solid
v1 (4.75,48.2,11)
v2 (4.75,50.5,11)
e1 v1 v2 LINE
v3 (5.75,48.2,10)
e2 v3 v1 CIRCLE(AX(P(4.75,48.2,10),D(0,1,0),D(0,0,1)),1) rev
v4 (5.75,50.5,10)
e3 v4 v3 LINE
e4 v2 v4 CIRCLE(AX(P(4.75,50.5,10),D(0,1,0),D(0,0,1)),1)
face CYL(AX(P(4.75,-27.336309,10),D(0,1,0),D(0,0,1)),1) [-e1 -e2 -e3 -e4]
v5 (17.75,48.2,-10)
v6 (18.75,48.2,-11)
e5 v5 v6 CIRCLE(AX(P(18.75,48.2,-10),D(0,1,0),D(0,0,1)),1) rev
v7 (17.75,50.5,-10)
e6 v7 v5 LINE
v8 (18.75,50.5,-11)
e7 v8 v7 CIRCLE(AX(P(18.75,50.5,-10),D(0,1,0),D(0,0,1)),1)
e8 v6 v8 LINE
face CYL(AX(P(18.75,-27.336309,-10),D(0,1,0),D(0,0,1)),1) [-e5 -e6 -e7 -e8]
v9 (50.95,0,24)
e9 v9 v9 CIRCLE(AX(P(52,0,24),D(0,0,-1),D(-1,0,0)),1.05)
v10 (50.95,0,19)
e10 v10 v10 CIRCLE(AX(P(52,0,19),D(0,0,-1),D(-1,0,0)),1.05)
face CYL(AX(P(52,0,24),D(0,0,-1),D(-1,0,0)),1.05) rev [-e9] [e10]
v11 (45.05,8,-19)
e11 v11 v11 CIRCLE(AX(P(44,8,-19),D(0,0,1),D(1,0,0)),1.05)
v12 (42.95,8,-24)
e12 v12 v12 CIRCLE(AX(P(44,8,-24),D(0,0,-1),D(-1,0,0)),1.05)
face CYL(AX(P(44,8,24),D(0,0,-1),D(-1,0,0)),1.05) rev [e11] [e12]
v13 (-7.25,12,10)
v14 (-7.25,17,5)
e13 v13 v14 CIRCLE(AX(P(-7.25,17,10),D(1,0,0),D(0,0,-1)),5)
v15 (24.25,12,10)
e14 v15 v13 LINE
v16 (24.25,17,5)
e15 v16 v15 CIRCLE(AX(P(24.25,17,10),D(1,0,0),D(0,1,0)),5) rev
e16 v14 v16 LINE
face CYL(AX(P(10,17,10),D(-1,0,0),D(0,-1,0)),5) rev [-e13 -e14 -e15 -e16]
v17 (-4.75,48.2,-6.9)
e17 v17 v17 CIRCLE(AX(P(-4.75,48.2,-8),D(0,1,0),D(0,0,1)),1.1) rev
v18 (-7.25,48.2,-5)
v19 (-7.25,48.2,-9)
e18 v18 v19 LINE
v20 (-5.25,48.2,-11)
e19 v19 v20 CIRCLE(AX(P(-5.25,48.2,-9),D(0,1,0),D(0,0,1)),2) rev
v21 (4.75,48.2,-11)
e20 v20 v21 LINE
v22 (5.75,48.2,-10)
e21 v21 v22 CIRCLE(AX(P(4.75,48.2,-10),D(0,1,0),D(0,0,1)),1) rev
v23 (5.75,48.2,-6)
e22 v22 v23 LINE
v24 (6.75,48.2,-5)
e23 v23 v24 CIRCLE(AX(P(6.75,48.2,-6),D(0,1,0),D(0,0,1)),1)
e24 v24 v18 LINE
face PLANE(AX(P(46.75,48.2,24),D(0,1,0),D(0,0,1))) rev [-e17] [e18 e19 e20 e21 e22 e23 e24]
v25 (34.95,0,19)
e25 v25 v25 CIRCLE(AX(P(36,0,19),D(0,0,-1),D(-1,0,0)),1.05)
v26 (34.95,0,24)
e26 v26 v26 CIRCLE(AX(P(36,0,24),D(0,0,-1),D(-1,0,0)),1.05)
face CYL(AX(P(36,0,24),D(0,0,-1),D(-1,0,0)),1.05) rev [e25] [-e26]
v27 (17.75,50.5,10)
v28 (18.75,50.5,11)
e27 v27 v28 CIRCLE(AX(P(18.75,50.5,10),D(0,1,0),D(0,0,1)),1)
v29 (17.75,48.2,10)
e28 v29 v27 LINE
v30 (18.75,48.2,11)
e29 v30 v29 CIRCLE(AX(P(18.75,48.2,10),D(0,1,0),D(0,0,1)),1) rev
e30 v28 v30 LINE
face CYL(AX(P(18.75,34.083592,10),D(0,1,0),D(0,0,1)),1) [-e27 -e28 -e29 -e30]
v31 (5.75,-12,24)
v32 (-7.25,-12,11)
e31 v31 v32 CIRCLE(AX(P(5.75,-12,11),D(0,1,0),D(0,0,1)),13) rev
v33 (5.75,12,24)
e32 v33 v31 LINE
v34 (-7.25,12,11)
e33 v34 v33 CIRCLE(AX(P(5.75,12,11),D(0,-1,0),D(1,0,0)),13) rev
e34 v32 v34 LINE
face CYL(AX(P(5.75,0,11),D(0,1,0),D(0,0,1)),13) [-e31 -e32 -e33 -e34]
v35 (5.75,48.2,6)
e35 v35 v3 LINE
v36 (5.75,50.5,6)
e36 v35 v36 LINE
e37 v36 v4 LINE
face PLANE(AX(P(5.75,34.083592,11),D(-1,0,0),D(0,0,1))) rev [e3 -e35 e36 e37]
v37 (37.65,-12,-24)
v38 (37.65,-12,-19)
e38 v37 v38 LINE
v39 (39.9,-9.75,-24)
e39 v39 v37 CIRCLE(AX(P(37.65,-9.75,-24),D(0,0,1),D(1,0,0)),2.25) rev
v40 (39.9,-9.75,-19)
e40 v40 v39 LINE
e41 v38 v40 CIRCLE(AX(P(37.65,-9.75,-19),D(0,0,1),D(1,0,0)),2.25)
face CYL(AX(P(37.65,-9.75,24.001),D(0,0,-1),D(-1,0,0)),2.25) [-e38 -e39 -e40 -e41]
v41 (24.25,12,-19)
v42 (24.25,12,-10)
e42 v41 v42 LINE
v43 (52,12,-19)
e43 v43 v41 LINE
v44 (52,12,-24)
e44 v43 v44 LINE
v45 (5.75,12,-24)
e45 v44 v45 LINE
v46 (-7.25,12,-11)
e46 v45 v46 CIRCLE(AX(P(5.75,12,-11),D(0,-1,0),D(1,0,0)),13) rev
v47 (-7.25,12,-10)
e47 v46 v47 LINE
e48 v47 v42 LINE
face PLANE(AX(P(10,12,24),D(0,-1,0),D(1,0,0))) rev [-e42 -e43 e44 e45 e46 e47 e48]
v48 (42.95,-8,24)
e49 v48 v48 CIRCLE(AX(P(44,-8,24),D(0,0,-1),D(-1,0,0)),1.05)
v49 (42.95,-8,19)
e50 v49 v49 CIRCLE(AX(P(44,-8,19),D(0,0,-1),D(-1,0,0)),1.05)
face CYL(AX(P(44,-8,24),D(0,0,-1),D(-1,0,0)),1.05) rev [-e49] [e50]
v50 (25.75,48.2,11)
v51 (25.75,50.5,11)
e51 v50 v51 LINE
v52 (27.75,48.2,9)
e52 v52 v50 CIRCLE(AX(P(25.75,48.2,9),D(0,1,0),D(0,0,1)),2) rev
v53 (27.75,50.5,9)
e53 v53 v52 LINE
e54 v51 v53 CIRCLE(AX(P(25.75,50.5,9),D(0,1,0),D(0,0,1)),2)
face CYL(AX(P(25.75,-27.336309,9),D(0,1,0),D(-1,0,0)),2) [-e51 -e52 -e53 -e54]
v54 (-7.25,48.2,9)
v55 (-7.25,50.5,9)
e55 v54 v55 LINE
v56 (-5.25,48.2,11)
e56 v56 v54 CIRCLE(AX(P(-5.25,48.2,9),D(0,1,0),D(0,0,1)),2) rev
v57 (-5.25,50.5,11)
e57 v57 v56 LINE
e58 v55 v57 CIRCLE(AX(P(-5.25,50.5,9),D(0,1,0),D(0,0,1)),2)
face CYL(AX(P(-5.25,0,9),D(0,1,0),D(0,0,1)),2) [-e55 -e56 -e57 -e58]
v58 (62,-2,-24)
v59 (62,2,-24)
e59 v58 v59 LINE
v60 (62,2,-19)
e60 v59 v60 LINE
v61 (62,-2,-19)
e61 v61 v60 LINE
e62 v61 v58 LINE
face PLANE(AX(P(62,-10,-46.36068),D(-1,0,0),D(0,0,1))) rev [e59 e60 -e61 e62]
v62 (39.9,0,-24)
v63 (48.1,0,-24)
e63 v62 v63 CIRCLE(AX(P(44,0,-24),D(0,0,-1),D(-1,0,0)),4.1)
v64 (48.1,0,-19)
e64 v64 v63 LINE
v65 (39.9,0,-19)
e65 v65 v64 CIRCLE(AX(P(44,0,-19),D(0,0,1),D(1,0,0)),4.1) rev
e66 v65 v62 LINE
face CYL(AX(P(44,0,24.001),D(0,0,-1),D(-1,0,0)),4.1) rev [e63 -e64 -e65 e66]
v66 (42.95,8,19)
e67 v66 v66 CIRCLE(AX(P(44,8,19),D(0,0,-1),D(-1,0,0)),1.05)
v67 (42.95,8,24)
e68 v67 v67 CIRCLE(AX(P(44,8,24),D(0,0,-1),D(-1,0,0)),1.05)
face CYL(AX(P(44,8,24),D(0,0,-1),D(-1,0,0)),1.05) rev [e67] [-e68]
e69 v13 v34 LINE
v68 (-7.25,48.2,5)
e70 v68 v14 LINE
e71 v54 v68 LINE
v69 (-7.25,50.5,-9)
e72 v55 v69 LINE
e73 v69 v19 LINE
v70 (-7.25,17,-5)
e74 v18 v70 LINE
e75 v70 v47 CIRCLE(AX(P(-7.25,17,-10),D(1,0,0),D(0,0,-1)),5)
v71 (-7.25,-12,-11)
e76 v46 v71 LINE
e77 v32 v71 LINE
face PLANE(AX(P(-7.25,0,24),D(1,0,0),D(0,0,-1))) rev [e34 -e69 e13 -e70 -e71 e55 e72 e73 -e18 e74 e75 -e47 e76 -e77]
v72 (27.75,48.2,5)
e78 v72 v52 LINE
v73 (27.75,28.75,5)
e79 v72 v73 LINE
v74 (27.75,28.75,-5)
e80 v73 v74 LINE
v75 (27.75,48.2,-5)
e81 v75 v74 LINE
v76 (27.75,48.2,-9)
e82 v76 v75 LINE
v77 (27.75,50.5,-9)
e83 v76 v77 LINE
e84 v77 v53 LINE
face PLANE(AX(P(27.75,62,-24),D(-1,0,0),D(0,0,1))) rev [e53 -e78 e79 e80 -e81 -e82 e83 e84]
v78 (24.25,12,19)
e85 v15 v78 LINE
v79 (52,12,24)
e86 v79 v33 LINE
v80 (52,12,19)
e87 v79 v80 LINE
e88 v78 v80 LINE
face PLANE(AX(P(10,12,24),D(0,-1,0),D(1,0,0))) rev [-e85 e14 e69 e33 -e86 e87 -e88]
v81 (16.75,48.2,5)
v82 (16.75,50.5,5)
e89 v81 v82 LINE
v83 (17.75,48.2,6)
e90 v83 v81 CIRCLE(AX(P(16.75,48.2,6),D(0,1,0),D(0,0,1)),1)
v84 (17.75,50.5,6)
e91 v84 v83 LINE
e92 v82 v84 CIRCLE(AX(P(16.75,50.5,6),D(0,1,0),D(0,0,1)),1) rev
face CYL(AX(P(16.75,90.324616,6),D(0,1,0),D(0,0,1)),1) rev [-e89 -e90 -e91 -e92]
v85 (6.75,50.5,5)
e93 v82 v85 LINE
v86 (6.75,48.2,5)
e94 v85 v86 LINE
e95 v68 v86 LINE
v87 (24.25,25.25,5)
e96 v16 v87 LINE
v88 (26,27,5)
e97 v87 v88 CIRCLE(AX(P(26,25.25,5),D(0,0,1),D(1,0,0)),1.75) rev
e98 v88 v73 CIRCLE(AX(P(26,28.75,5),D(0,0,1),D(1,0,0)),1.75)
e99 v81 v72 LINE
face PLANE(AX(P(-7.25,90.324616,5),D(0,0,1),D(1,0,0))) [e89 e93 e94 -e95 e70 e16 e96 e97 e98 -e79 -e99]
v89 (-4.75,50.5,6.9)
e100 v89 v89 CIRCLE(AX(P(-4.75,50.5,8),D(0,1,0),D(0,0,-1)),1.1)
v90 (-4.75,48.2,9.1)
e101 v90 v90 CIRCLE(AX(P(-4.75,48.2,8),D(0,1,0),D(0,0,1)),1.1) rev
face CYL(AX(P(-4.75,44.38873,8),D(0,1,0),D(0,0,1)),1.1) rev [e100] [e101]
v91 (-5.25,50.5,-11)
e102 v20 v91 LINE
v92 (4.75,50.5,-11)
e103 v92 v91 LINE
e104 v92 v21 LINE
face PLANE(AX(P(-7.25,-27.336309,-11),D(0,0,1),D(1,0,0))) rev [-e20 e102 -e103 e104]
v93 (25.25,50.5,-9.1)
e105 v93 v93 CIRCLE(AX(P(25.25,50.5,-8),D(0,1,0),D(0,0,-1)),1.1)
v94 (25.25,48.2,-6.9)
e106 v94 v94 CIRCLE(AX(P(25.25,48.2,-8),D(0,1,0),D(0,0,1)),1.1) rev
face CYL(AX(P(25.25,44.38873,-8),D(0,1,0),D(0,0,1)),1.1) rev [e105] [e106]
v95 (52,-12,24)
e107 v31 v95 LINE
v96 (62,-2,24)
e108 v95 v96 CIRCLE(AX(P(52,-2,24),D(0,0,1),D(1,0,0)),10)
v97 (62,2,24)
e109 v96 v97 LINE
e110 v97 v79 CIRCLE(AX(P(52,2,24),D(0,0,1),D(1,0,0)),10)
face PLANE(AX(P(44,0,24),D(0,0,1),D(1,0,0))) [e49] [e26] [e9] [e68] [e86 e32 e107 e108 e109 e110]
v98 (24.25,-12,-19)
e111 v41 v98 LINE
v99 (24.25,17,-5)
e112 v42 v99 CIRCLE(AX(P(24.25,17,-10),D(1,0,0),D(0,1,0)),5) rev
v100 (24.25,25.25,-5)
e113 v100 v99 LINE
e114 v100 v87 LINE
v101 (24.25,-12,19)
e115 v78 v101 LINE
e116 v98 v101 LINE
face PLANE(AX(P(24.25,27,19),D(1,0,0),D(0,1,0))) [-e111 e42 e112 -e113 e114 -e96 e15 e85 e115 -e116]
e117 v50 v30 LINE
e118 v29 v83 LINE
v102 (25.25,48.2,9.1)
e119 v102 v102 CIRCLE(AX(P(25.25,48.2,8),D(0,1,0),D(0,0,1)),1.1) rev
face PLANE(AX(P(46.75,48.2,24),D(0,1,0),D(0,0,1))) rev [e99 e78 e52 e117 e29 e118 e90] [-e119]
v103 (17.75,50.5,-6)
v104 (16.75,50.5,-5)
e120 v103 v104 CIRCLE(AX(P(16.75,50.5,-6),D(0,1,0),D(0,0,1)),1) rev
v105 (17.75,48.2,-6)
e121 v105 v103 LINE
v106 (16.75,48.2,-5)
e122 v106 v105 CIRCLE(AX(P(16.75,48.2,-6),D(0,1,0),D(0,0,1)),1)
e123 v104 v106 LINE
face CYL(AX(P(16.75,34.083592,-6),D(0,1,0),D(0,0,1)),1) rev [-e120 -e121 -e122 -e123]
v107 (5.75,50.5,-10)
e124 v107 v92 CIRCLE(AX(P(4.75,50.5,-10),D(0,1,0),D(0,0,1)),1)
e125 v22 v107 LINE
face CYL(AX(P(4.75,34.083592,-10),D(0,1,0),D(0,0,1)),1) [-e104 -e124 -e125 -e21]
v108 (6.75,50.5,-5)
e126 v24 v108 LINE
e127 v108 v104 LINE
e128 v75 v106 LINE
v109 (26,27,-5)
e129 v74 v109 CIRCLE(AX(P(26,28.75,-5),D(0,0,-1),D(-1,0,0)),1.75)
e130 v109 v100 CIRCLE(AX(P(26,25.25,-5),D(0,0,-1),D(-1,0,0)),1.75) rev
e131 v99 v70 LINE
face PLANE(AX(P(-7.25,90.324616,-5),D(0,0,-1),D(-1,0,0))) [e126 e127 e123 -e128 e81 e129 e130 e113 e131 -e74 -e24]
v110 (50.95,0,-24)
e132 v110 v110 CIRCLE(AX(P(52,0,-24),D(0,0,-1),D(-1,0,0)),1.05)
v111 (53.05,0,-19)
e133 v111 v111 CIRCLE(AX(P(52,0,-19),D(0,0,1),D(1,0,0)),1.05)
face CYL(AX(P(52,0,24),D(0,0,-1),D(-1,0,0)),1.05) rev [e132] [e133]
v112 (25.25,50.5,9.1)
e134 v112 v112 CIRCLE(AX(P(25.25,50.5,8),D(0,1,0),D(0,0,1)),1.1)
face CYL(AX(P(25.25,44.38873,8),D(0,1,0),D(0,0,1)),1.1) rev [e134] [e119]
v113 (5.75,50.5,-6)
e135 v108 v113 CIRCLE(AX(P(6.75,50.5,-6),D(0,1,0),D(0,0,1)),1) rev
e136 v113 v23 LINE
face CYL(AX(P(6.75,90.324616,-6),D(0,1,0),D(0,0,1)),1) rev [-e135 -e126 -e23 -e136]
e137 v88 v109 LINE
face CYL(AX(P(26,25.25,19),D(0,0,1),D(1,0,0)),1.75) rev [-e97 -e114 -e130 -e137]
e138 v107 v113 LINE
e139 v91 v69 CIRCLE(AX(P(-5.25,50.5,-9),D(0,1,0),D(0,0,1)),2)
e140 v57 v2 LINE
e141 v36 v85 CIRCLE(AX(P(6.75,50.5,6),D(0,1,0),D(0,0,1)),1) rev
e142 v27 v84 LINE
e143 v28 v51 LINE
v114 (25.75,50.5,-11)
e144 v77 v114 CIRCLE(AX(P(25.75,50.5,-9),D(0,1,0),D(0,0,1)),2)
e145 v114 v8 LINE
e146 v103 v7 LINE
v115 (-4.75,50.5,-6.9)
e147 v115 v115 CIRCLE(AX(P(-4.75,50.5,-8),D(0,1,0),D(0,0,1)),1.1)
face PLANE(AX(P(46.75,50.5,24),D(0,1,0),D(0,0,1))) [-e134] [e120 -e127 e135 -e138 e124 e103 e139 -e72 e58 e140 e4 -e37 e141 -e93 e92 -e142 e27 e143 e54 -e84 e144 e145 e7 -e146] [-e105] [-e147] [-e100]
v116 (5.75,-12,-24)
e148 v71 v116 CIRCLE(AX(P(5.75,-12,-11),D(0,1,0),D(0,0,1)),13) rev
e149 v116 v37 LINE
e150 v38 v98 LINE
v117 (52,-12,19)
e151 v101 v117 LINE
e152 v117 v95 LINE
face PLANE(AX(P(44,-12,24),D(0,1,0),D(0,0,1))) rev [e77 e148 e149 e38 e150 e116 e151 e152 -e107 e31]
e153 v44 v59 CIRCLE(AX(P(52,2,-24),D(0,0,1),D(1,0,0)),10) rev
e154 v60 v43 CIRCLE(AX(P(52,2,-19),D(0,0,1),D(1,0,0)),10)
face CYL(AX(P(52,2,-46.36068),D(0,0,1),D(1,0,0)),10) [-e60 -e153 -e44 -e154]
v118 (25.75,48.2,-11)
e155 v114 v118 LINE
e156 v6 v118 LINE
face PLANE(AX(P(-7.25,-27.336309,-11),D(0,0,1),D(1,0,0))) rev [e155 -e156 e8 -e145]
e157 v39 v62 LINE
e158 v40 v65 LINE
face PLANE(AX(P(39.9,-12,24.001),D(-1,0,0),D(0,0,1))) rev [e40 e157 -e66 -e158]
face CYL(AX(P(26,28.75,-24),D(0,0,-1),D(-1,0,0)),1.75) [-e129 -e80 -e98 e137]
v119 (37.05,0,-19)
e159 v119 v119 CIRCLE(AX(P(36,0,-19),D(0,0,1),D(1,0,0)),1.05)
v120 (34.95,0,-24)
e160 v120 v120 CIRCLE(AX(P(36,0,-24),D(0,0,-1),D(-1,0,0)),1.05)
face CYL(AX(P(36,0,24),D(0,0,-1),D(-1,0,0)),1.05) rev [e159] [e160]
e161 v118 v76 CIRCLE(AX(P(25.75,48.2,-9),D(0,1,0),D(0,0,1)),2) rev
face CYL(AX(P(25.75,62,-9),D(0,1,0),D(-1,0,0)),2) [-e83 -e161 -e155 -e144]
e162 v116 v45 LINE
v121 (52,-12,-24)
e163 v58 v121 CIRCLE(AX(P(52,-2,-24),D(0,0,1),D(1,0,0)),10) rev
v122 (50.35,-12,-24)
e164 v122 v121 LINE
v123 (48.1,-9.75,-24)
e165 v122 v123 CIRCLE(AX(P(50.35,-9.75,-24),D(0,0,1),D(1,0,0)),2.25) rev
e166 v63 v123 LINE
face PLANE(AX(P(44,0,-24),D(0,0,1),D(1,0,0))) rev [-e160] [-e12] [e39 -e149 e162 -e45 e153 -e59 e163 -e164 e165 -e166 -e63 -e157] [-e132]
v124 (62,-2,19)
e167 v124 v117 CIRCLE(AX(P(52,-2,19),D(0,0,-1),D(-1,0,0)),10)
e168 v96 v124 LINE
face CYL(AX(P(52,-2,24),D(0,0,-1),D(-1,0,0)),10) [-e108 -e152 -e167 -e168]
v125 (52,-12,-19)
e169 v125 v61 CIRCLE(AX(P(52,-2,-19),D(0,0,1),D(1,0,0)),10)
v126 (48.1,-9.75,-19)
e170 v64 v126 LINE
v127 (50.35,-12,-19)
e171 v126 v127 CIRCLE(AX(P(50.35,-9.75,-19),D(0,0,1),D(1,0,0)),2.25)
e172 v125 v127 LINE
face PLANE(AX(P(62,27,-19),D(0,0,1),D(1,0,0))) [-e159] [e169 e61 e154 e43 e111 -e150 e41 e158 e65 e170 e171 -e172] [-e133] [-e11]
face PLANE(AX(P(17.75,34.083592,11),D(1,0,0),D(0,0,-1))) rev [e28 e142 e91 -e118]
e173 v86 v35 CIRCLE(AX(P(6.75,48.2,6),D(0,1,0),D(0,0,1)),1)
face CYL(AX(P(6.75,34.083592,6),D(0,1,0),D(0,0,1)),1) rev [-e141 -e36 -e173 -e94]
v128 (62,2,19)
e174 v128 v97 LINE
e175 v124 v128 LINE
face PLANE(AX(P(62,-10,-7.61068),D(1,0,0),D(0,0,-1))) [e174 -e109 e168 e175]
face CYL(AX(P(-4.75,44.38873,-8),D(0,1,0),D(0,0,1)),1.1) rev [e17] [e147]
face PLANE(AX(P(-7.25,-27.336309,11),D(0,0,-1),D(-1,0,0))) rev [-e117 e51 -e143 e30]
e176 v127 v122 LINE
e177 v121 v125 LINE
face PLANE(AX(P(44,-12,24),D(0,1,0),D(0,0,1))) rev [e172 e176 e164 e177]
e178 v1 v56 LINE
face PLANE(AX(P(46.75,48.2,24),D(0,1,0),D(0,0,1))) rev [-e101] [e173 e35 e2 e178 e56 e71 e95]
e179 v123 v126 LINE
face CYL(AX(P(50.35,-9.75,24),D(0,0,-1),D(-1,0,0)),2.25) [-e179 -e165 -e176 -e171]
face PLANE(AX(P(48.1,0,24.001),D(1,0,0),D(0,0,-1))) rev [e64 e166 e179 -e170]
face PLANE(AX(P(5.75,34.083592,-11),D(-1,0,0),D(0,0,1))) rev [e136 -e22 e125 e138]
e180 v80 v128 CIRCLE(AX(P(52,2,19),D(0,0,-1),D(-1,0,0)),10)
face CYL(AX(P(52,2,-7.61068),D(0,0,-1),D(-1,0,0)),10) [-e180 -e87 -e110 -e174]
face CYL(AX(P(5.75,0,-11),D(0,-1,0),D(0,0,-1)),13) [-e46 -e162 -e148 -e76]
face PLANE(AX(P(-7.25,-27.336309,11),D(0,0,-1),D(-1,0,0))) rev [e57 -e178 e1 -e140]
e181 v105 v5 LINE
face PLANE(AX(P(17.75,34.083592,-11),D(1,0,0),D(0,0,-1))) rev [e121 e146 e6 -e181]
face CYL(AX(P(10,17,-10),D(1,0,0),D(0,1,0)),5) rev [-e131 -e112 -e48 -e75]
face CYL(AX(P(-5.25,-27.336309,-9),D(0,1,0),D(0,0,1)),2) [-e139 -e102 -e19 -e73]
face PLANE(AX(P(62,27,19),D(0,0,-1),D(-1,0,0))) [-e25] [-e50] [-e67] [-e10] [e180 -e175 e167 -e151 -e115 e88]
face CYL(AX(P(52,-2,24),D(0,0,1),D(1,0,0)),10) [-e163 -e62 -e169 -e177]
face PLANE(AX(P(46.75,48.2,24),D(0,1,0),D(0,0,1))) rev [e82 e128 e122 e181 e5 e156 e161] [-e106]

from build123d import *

# Parameters (mm, degrees)
EXTRUDE_1_DEPTH         = 24
SKETCH_2_W              = 24
SKETCH_2_H              = 29.5
CUT_EXTRUDE_1_DEPTH     = 79.714674617
SKETCH_3_R              = 1.1
CUT_EXTRUDE_2_DEPTH     = 96.205041883
SKETCH_4_W              = 15
SKETCH_4_H              = 48
EXTRUDE_2_DEPTH         = 52
SKETCH_5_W              = 35
SKETCH_5_H              = 13
CUT_EXTRUDE_3_DEPTH     = 52
SKETCH_6_W              = 35
SKETCH_6_H              = 20.5
CUT_EXTRUDE_4_DEPTH     = 11.5
SKETCH_7_W              = 35
SKETCH_7_H              = 19
CUT_EXTRUDE_5_DEPTH     = 37.5
SKETCH_8_R              = 1.1
CUT_EXTRUDE_6_DEPTH     = 3
CUT_EXTRUDE_7_DEPTH     = 96.205041883
SKETCH_10_W             = 35
SKETCH_10_H             = 22
CUT_EXTRUDE_8_DEPTH     = 11.5
SKETCH_11_W             = 12
SKETCH_11_H             = 6
CUT_EXTRUDE_9_DEPTH     = 3
FILLET_1_R              = 2
FILLET_2_R              = 1
SKETCH_14_R             = 0.75
CUT_EXTRUDE_12_DEPTH    = 8
SKETCH_17_R             = 1.9
CUT_EXTRUDE_13_DEPTH    = 1.4
SKETCH_26_W             = 65.219467354
SKETCH_26_H             = 31.879169378
CUT_EXTRUDE_17_DEPTH    = 2.75
CUT_EXTRUDE_18_DEPTH    = 0.7
SKETCH_28_R             = 4.45
EXTRUDE_11_DEPTH        = 8
EXTRUDE_12_REACH        = 89.179
SKETCH_29_W             = 35
SKETCH_29_H             = 48
SKETCH4_R               = 1.9
CUT_EXTRUDE3_DEPTH      = 1
BOSS_EXTRUDE2_DEPTH     = 9.25
CUT_EXTRUDE4_START      = -17.25
CUT_EXTRUDE4_DEPTH      = 8
BOSS_EXTRUDE3_START     = 29.5
BOSS_EXTRUDE3_DEPTH     = 9.25
CUT_EXTRUDE5_START      = 38.75
CUT_EXTRUDE5_DEPTH      = 49.724639182
SKETCH6_W               = 10
SKETCH6_H               = 20
BOSS_EXTRUDE4_DEPTH     = 9.25
BOSS_EXTRUDE5_START     = -38.75
SKETCH6_2_W             = 10
SKETCH6_2_H             = 20
BOSS_EXTRUDE5_DEPTH     = 9.25
MOVE_FACE1_BY           = 2
MOVE_FACE2_BY           = 2
MOVE_FACE3_BY           = 8
MOVE_FACE3_2_BY         = 8
CUT_EXTRUDE6_DEPTH      = 15
CUT_EXTRUDE6_DEPTH_BACK = 77.826102335
SKETCH7_W               = 37.75
SKETCH7_H               = 38
SKETCH8_R               = 1.05
CUT_EXTRUDE7_DEPTH      = 94.264409074
CUT_EXTRUDE8_REACH      = 95.264
FILLET1_R               = 10
FILLET2_R               = 2.25
FILLET3_R               = 1.75
FILLET4_R               = 13
FILLET5_R               = 5


with BuildPart() as part:
    # 草图1 → 凸台-拉伸1 (new, symmetric)
    with BuildSketch(Plane.XY):
        with BuildLine():
            Line((10, 10), (44, 10))
            ThreePointArc((44, 10), (54, 0), (44, -10))
            Line((44, -10), (0, -10))
            Line((0, -10), (-10, -10))
            Line((-10, -10), (-10, 0))
            Line((-10, 0), (-10, 62))
            Line((-10, 62), (10, 62))
            Line((10, 62), (10, 10))
        make_face()
    extrude(amount=EXTRUDE_1_DEPTH, both=True)

    # 草图2 → 切除-拉伸1 (cut, through all)
    with BuildSketch(Plane(origin=(0, 10, 0), x_dir=(1, 0, 0), z_dir=(0, 1, 0))):
        with Locations((42, 0)):
            Rectangle(SKETCH_2_W, SKETCH_2_H)
    extrude(amount=-CUT_EXTRUDE_1_DEPTH, mode=Mode.SUBTRACT)

    # 草图3 → 切除-拉伸2 (cut, through all)
    with BuildSketch(Plane.XY.offset(24)):
        with Locations((44, 6)):
            Circle(SKETCH_3_R)
        with Locations((50, 0)):
            Circle(SKETCH_3_R)
        with Locations((44, -6)):
            Circle(SKETCH_3_R)
        with Locations((38, 0)):
            Circle(SKETCH_3_R)
    extrude(amount=-CUT_EXTRUDE_2_DEPTH, mode=Mode.SUBTRACT)

    # 草图4 → 凸台-拉伸2 (add, through all)
    with BuildSketch(Plane(origin=(0, 10, 0), x_dir=(1, 0, 0), z_dir=(0, 1, 0))):
        with Locations((17.5, 0)):
            Rectangle(SKETCH_4_W, SKETCH_4_H)
    extrude(amount=EXTRUDE_2_DEPTH)

    # 草图5 → 切除-拉伸3 (cut)
    with BuildSketch(Plane(origin=(0, 62, 0), x_dir=(1, 0, 0), z_dir=(0, 1, 0))):
        with Locations((7.5, -17.5)):
            Rectangle(SKETCH_5_W, SKETCH_5_H)
        with Locations((7.5, 17.5)):
            Rectangle(SKETCH_5_W, SKETCH_5_H)
    extrude(amount=-CUT_EXTRUDE_3_DEPTH, mode=Mode.SUBTRACT)

    # 草图6 → 切除-拉伸4 (cut)
    with BuildSketch(Plane(origin=(0, 62, 0), x_dir=(1, 0, 0), z_dir=(0, 1, 0))):
        with Locations((7.5, 0)):
            Rectangle(SKETCH_6_W, SKETCH_6_H)
    extrude(amount=-CUT_EXTRUDE_4_DEPTH, mode=Mode.SUBTRACT)

    # 草图7 → 切除-拉伸5 (cut)
    with BuildSketch(Plane(origin=(0, 10, 0), x_dir=(1, 0, 0), z_dir=(0, 1, 0))):
        with Locations((7.5, 14.5)):
            Rectangle(SKETCH_7_W, SKETCH_7_H)
        with Locations((7.5, -14.5)):
            Rectangle(SKETCH_7_W, SKETCH_7_H)
    extrude(amount=CUT_EXTRUDE_5_DEPTH, mode=Mode.SUBTRACT)

    # 草图8 → 切除-拉伸6 (cut)
    with BuildSketch(Plane(origin=(0, 50.5, 0), x_dir=(1, 0, 0), z_dir=(0, 1, 0))):
        with Locations(Location((-7.5, 8, 0), (0, 0, 270))):
            Circle(SKETCH_8_R)
        with Locations(Location((22.5, 8, 0), (0, 0, 270))):
            Circle(SKETCH_8_R)
        with Locations(Location((22.5, -8, 0), (0, 0, 270))):
            Circle(SKETCH_8_R)
        with Locations(Location((-7.5, -8, 0), (0, 0, 270))):
            Circle(SKETCH_8_R)
    extrude(amount=-CUT_EXTRUDE_6_DEPTH, mode=Mode.SUBTRACT)

    # 草图9 → 切除-拉伸7 (cut, through all)
    with BuildSketch(Plane.XY.offset(24)):
        Polygon((-10, 4), (25, -10), (-10, -10), align=None)
    extrude(amount=-CUT_EXTRUDE_7_DEPTH, mode=Mode.SUBTRACT)

    # 草图10 → 切除-拉伸8 (cut)
    with BuildSketch(Plane(origin=(0, 62, 0), x_dir=(1, 0, 0), z_dir=(0, 1, 0))):
        with Locations((7.5, 0)):
            Rectangle(SKETCH_10_W, SKETCH_10_H)
    extrude(amount=-CUT_EXTRUDE_8_DEPTH, mode=Mode.SUBTRACT)

    # 草图11 → 切除-拉伸9 (cut)
    with BuildSketch(Plane(origin=(0, 50.5, 0), x_dir=(1, 0, 0), z_dir=(0, 1, 0))):
        with Locations((9, -8)):
            Rectangle(SKETCH_11_W, SKETCH_11_H)
        with Locations((9, 8)):
            Rectangle(SKETCH_11_W, SKETCH_11_H)
    extrude(amount=-CUT_EXTRUDE_9_DEPTH, mode=Mode.SUBTRACT)

    # 圆角1
    fillet_1_edges = [part.edges().sort_by_distance(p)[0] for p in [
        (-10, 49, -11),
        (25, 49, -11),
        (25, 49, 11),
        (-10, 49, 11),
    ]]
    fillet(fillet_1_edges, radius=FILLET_1_R)

    # 圆角2
    fillet_2_edges = [part.edges().sort_by_distance(p)[0] for p in [
        (3, 49, 11),
        (3, 49, 5),
        (15, 49, 5),
        (15, 49, 11),
        (3, 49, -11),
        (15, 49, -11),
        (15, 49, -5),
        (3, 49, -5),
    ]]
    fillet(fillet_2_edges, radius=FILLET_2_R)

    # 草图14 → 切除-拉伸12 (cut)
    with BuildSketch(Plane.XY.offset(24)):
        with Locations((12, 7)):
            Circle(SKETCH_14_R)
        with Locations((26, 7)):
            Circle(SKETCH_14_R)
    extrude(amount=-CUT_EXTRUDE_12_DEPTH, mode=Mode.SUBTRACT)

    # 草图17 → 切除-拉伸13 (cut)
    with BuildSketch(Plane.XY.offset(24)):
        with Locations((44, 6)):
            Circle(SKETCH_17_R)
        with Locations((50, 0)):
            Circle(SKETCH_17_R)
        with Locations((44, -6)):
            Circle(SKETCH_17_R)
        with Locations((38, 0)):
            Circle(SKETCH_17_R)
    extrude(amount=-CUT_EXTRUDE_13_DEPTH, mode=Mode.SUBTRACT)

    # 草图26 → 切除-拉伸17 (cut)
    with BuildSketch(Plane(origin=(30, 0, 0), x_dir=(0, 0, -1), z_dir=(1, 0, 0))):
        with Locations((0, -0.918796831)):
            Rectangle(SKETCH_26_W, SKETCH_26_H)
    extrude(amount=-CUT_EXTRUDE_17_DEPTH, mode=Mode.SUBTRACT)


with BuildPart() as cut_extrude_17_piece_1:
    # of the separate pieces the step leaves, piece 1, a body of its own (cut_extrude_17_pieces)
    add(part.part.solids().sort_by_distance((2, 47.5, -11))[0])


with BuildPart() as cut_extrude_17_piece_2:
    # of the separate pieces the step leaves, piece 2, a body of its own (cut_extrude_17_pieces)
    add(part.part.solids().sort_by_distance((44, 10, -24))[0])


with BuildPart() as cut_extrude_17_piece_3:
    # of the separate pieces the step leaves, piece 3, a body of its own (cut_extrude_17_pieces)
    add(part.part.solids().sort_by_distance((30, 10, 24))[0])


with BuildPart() as cut_extrude_17_piece_1_1:
    # Move Body 1: moved
    add(cut_extrude_17_piece_1.part.moved(Location((2.75, 0, 0))))


with BuildPart() as cut_extrude_17_piece_2_1:
    add(cut_extrude_17_piece_2.part)

    # Combine 1: union 切除-拉伸17 piece 3, 切除-拉伸17 piece 1
    add(cut_extrude_17_piece_3.part)
    add(cut_extrude_17_piece_1_1.part)

    # 草图27 → 切除-拉伸18 (cut)
    with BuildSketch(Plane.XZ.offset(-47.5)):
        with BuildLine():
            Line((25.75, 11), (18.75, 11))
            ThreePointArc((18.75, 11), (18.042893219, 10.707106781), (17.75, 10))
            Line((17.75, 10), (17.75, 6))
            ThreePointArc((17.75, 6), (17.457106781, 5.292893219), (16.75, 5))
            Line((16.75, 5), (27.75, 5))
            Line((27.75, 5), (27.75, 9))
            ThreePointArc((27.75, 9), (27.164213562, 10.414213562), (25.75, 11))
        make_face()
        with BuildLine():
            Line((5.75, 6), (5.75, 10))
            ThreePointArc((5.75, 10), (5.457106781, 10.707106781), (4.75, 11))
            Line((4.75, 11), (-5.25, 11))
            ThreePointArc((-5.25, 11), (-6.664213562, 10.414213562), (-7.25, 9))
            Line((-7.25, 9), (-7.25, 5))
            Line((-7.25, 5), (6.75, 5))
            ThreePointArc((6.75, 5), (6.042893219, 5.292893219), (5.75, 6))
        make_face()
        with BuildLine():
            Line((-5.25, -11), (4.75, -11))
            ThreePointArc((4.75, -11), (5.457106781, -10.707106781), (5.75, -10))
            Line((5.75, -10), (5.75, -6))
            ThreePointArc((5.75, -6), (6.042893219, -5.292893219), (6.75, -5))
            Line((6.75, -5), (-7.25, -5))
            Line((-7.25, -5), (-7.25, -9))
            ThreePointArc((-7.25, -9), (-6.664213562, -10.414213562), (-5.25, -11))
        make_face()
        with BuildLine():
            Line((17.75, -6), (17.75, -10))
            ThreePointArc((17.75, -10), (18.042893219, -10.707106781), (18.75, -11))
            Line((18.75, -11), (25.75, -11))
            ThreePointArc((25.75, -11), (27.164213562, -10.414213562), (27.75, -9))
            Line((27.75, -9), (27.75, -5))
            Line((27.75, -5), (16.75, -5))
            ThreePointArc((16.75, -5), (17.457106781, -5.292893219), (17.75, -6))
        make_face()
    extrude(amount=-CUT_EXTRUDE_18_DEPTH, mode=Mode.SUBTRACT)

    # 草图28 → 凸台-拉伸11 (add)
    with BuildSketch(Plane.XY.offset(24)):
        with Locations(Location((44, 0, 0), (0, 0, 167.792342))):
            Circle(SKETCH_28_R)
    extrude(amount=EXTRUDE_11_DEPTH)

    # 凸台-拉伸12: up to this face of the body (flat: up to its plane)
    extrude_12_end = Plane(cut_extrude_17_piece_2_1.part.faces().sort_by_distance((10.25, -3, 0))[0])
    # 草图29 → 凸台-拉伸12 (add, up to the picked face)
    with BuildSketch(Plane.XZ.offset(10), mode=Mode.PRIVATE) as extrude_12_sk1:
        with Locations((10.25, 0)):
            Rectangle(SKETCH_29_W, SKETCH_29_H)
    extrude_12_tool1 = split(extrude(extrude_12_sk1.sketch, amount=-EXTRUDE_12_REACH, mode=Mode.PRIVATE), bisect_by=extrude_12_end, keep=Keep.BOTH, mode=Mode.PRIVATE)
    add(extrude_12_tool1.solids().sort_by(Axis((10.25, -10, 0), (0, 1, 0)))[0])

    # Mirror12: 切除-拉伸17 piece 2 across plane


with BuildPart() as cut_extrude_17_piece_2_2:
    add(cut_extrude_17_piece_2_1.part)
    add(cut_extrude_17_piece_2_1.part.mirror(Plane.XY))

    # Sketch4 → Cut-Extrude3 (cut)
    with BuildSketch(Plane.XY.offset(24)):
        with Locations((38, 0)):
            Circle(SKETCH4_R)
        with Locations((44, -6)):
            Circle(SKETCH4_R)
        with Locations((50, 0)):
            Circle(SKETCH4_R)
        with Locations((44, 6)):
            Circle(SKETCH4_R)
    cut_extrude3 = extrude(amount=-CUT_EXTRUDE3_DEPTH, mode=Mode.SUBTRACT)

    # Mirror13: Cut-Extrude3 across plane
    add(cut_extrude3.mirror(Plane.XY), mode=Mode.SUBTRACT)

    # Sketch5 → Boss-Extrude2 (add)
    with BuildSketch(Plane(origin=(0, 0, 14.75), x_dir=(-1, 0, 0), z_dir=(0, 0, -1))):
        with BuildLine():
            Line((-44, -10), (-30, -10))
            Line((-30, -10), (-30, 10))
            Line((-30, 10), (-44, 10))
            ThreePointArc((-44, 10), (-54, 0), (-44, -10))
        make_face()
    extrude(amount=-BOSS_EXTRUDE2_DEPTH)

    # Sketch5<2> → Cut-Extrude4 (cut)
    with BuildSketch(Plane(origin=(0, 0, 14.75), x_dir=(-1, 0, 0), z_dir=(0, 0, -1)).offset(CUT_EXTRUDE4_START)):
        with BuildLine():
            Line((-44, -10), (-30, -10))
            Line((-30, -10), (-30, 10))
            Line((-30, 10), (-44, 10))
            ThreePointArc((-44, 10), (-54, 0), (-44, -10))
        make_face()
    extrude(amount=CUT_EXTRUDE4_DEPTH, mode=Mode.SUBTRACT)

    # Sketch5<3> → Boss-Extrude3 (add)
    with BuildSketch(Plane(origin=(0, 0, 14.75), x_dir=(-1, 0, 0), z_dir=(0, 0, -1)).offset(BOSS_EXTRUDE3_START)):
        with BuildLine():
            Line((-44, -10), (-30, -10))
            Line((-30, -10), (-30, 10))
            Line((-30, 10), (-44, 10))
            ThreePointArc((-44, 10), (-54, 0), (-44, -10))
        make_face()
    extrude(amount=BOSS_EXTRUDE3_DEPTH)

    # Sketch5<4> → Cut-Extrude5 (cut, through all)
    with BuildSketch(Plane(origin=(0, 0, 14.75), x_dir=(-1, 0, 0), z_dir=(0, 0, -1)).offset(CUT_EXTRUDE5_START)):
        with BuildLine():
            Line((-44, -10), (-30, -10))
            Line((-30, -10), (-30, 10))
            Line((-30, 10), (-44, 10))
            ThreePointArc((-44, 10), (-54, 0), (-44, -10))
        make_face()
    extrude(amount=CUT_EXTRUDE5_DEPTH, mode=Mode.SUBTRACT)

    # Sketch6 → Boss-Extrude4 (add)
    with BuildSketch(Plane.XY.offset(24)):
        with Locations((49, 0)):
            Rectangle(SKETCH6_W, SKETCH6_H)
    extrude(amount=-BOSS_EXTRUDE4_DEPTH)

    # Sketch6<2> → Boss-Extrude5 (add)
    with BuildSketch(Plane.XY.offset(24).offset(BOSS_EXTRUDE5_START)):
        with Locations((49, 0)):
            Rectangle(SKETCH6_2_W, SKETCH6_2_H)
    extrude(amount=-BOSS_EXTRUDE5_DEPTH)

    # Move Face1: a face moved outward by 2.0
    extrude(cut_extrude_17_piece_2_2.faces().sort_by_distance((23.375, 10, -12))[0], amount=MOVE_FACE1_BY, dir=(0, 1, 0))

    # Move Face2: a face moved outward by 2.0
    extrude(cut_extrude_17_piece_2_2.faces().sort_by_distance((17.467069892, -10, 0))[0], amount=MOVE_FACE2_BY, dir=(0, -1, 0))

    # Move Face3: a face moved outward by 8.0
    extrude(cut_extrude_17_piece_2_2.faces().sort_by_distance((54, 0, 19.375))[0], amount=MOVE_FACE3_BY, dir=(1, 0, 0))

    # Move Face3 2: a face moved outward by 8.0
    extrude(cut_extrude_17_piece_2_2.faces().sort_by_distance((54, 0, -19.375))[0], amount=MOVE_FACE3_2_BY, dir=(1, 0, 0))

    # Sketch7 → Cut-Extrude6 (cut, two sides: drawn at the far end of the back side and taken through both)
    with BuildSketch(Plane(origin=(0, 12, 0), x_dir=(1, 0, 0), z_dir=(0, 1, 0)).offset(-CUT_EXTRUDE6_DEPTH_BACK)):
        with Locations((43.125, 0)):
            Rectangle(SKETCH7_W, SKETCH7_H)
    extrude(amount=CUT_EXTRUDE6_DEPTH + CUT_EXTRUDE6_DEPTH_BACK, mode=Mode.SUBTRACT)

    # Sketch8 → Cut-Extrude7 (cut, through all)
    with BuildSketch(Plane(origin=(0, 0, -24), x_dir=(-1, 0, 0), z_dir=(0, 0, -1))):
        with Locations((-44, 8)):
            Circle(SKETCH8_R)
        with Locations((-36, 0)):
            Circle(SKETCH8_R)
        with Locations((-44, -8)):
            Circle(SKETCH8_R)
        with Locations((-52, 0)):
            Circle(SKETCH8_R)
    extrude(amount=-CUT_EXTRUDE7_DEPTH, mode=Mode.SUBTRACT)

    # Sketch9 → Cut-Extrude8 (cut, up to next)
    with BuildSketch(Plane(origin=(0, 0, -24), x_dir=(-1, 0, 0), z_dir=(0, 0, -1)), mode=Mode.PRIVATE) as cut_extrude8_sk1:
        with BuildLine():
            Line((-48.1, 0), (-48.1, -12))
            Line((-48.1, -12), (-39.9, -12))
            Line((-39.9, -12), (-39.9, 0))
            ThreePointArc((-39.9, 0), (-44, 4.1), (-48.1, 0))
        make_face()
    cut_extrude8_tool1 = extrude(cut_extrude8_sk1.sketch, amount=-CUT_EXTRUDE8_REACH, mode=Mode.PRIVATE) & cut_extrude_17_piece_2_2.part
    add(cut_extrude8_tool1.solids().sort_by_distance((44, -4.362424, -24))[0], mode=Mode.SUBTRACT)

    # Fillet1
    fillet1_edges = [cut_extrude_17_piece_2_2.edges().sort_by_distance(p)[0] for p in [
        (62, 12, -21.5),
        (62, -12, -21.5),
        (62, -12, 21.5),
        (62, 12, 21.5),
    ]]
    fillet(fillet1_edges, radius=FILLET1_R)

    # Fillet2
    fillet2_edges = [cut_extrude_17_piece_2_2.edges().sort_by_distance(p)[0] for p in [
        (48.1, -12, -21.5),
        (39.9, -12, -21.5),
    ]]
    fillet(fillet2_edges, radius=FILLET2_R)

    # Fillet3
    fillet3_edges = [cut_extrude_17_piece_2_2.edges().sort_by_distance(p)[0] for p in [
        (24.25, 27, 0),
    ]]
    fillet(fillet3_edges, radius=FILLET3_R)
    fillet3_2_edges = [cut_extrude_17_piece_2_2.edges().sort_by_distance(p)[0] for p in [
        (27.75, 27, 0),
    ]]
    fillet(fillet3_2_edges, radius=FILLET3_R - 0.0001)  # a hair under: the kernel refuses the full size

    # Fillet4
    fillet4_edges = [cut_extrude_17_piece_2_2.edges().sort_by_distance(p)[0] for p in [
        (-7.25, 0, 24),
        (-7.25, 0, -24),
    ]]
    fillet(fillet4_edges, radius=FILLET4_R)

    # Fillet5
    fillet5_edges = [cut_extrude_17_piece_2_2.edges().sort_by_distance(p)[0] for p in [
        (8.5, 12, 5),
        (8.5, 12, -5),
    ]]
    fillet(fillet5_edges, radius=FILLET5_R)


solid = cut_extrude_17_piece_2_2.part
